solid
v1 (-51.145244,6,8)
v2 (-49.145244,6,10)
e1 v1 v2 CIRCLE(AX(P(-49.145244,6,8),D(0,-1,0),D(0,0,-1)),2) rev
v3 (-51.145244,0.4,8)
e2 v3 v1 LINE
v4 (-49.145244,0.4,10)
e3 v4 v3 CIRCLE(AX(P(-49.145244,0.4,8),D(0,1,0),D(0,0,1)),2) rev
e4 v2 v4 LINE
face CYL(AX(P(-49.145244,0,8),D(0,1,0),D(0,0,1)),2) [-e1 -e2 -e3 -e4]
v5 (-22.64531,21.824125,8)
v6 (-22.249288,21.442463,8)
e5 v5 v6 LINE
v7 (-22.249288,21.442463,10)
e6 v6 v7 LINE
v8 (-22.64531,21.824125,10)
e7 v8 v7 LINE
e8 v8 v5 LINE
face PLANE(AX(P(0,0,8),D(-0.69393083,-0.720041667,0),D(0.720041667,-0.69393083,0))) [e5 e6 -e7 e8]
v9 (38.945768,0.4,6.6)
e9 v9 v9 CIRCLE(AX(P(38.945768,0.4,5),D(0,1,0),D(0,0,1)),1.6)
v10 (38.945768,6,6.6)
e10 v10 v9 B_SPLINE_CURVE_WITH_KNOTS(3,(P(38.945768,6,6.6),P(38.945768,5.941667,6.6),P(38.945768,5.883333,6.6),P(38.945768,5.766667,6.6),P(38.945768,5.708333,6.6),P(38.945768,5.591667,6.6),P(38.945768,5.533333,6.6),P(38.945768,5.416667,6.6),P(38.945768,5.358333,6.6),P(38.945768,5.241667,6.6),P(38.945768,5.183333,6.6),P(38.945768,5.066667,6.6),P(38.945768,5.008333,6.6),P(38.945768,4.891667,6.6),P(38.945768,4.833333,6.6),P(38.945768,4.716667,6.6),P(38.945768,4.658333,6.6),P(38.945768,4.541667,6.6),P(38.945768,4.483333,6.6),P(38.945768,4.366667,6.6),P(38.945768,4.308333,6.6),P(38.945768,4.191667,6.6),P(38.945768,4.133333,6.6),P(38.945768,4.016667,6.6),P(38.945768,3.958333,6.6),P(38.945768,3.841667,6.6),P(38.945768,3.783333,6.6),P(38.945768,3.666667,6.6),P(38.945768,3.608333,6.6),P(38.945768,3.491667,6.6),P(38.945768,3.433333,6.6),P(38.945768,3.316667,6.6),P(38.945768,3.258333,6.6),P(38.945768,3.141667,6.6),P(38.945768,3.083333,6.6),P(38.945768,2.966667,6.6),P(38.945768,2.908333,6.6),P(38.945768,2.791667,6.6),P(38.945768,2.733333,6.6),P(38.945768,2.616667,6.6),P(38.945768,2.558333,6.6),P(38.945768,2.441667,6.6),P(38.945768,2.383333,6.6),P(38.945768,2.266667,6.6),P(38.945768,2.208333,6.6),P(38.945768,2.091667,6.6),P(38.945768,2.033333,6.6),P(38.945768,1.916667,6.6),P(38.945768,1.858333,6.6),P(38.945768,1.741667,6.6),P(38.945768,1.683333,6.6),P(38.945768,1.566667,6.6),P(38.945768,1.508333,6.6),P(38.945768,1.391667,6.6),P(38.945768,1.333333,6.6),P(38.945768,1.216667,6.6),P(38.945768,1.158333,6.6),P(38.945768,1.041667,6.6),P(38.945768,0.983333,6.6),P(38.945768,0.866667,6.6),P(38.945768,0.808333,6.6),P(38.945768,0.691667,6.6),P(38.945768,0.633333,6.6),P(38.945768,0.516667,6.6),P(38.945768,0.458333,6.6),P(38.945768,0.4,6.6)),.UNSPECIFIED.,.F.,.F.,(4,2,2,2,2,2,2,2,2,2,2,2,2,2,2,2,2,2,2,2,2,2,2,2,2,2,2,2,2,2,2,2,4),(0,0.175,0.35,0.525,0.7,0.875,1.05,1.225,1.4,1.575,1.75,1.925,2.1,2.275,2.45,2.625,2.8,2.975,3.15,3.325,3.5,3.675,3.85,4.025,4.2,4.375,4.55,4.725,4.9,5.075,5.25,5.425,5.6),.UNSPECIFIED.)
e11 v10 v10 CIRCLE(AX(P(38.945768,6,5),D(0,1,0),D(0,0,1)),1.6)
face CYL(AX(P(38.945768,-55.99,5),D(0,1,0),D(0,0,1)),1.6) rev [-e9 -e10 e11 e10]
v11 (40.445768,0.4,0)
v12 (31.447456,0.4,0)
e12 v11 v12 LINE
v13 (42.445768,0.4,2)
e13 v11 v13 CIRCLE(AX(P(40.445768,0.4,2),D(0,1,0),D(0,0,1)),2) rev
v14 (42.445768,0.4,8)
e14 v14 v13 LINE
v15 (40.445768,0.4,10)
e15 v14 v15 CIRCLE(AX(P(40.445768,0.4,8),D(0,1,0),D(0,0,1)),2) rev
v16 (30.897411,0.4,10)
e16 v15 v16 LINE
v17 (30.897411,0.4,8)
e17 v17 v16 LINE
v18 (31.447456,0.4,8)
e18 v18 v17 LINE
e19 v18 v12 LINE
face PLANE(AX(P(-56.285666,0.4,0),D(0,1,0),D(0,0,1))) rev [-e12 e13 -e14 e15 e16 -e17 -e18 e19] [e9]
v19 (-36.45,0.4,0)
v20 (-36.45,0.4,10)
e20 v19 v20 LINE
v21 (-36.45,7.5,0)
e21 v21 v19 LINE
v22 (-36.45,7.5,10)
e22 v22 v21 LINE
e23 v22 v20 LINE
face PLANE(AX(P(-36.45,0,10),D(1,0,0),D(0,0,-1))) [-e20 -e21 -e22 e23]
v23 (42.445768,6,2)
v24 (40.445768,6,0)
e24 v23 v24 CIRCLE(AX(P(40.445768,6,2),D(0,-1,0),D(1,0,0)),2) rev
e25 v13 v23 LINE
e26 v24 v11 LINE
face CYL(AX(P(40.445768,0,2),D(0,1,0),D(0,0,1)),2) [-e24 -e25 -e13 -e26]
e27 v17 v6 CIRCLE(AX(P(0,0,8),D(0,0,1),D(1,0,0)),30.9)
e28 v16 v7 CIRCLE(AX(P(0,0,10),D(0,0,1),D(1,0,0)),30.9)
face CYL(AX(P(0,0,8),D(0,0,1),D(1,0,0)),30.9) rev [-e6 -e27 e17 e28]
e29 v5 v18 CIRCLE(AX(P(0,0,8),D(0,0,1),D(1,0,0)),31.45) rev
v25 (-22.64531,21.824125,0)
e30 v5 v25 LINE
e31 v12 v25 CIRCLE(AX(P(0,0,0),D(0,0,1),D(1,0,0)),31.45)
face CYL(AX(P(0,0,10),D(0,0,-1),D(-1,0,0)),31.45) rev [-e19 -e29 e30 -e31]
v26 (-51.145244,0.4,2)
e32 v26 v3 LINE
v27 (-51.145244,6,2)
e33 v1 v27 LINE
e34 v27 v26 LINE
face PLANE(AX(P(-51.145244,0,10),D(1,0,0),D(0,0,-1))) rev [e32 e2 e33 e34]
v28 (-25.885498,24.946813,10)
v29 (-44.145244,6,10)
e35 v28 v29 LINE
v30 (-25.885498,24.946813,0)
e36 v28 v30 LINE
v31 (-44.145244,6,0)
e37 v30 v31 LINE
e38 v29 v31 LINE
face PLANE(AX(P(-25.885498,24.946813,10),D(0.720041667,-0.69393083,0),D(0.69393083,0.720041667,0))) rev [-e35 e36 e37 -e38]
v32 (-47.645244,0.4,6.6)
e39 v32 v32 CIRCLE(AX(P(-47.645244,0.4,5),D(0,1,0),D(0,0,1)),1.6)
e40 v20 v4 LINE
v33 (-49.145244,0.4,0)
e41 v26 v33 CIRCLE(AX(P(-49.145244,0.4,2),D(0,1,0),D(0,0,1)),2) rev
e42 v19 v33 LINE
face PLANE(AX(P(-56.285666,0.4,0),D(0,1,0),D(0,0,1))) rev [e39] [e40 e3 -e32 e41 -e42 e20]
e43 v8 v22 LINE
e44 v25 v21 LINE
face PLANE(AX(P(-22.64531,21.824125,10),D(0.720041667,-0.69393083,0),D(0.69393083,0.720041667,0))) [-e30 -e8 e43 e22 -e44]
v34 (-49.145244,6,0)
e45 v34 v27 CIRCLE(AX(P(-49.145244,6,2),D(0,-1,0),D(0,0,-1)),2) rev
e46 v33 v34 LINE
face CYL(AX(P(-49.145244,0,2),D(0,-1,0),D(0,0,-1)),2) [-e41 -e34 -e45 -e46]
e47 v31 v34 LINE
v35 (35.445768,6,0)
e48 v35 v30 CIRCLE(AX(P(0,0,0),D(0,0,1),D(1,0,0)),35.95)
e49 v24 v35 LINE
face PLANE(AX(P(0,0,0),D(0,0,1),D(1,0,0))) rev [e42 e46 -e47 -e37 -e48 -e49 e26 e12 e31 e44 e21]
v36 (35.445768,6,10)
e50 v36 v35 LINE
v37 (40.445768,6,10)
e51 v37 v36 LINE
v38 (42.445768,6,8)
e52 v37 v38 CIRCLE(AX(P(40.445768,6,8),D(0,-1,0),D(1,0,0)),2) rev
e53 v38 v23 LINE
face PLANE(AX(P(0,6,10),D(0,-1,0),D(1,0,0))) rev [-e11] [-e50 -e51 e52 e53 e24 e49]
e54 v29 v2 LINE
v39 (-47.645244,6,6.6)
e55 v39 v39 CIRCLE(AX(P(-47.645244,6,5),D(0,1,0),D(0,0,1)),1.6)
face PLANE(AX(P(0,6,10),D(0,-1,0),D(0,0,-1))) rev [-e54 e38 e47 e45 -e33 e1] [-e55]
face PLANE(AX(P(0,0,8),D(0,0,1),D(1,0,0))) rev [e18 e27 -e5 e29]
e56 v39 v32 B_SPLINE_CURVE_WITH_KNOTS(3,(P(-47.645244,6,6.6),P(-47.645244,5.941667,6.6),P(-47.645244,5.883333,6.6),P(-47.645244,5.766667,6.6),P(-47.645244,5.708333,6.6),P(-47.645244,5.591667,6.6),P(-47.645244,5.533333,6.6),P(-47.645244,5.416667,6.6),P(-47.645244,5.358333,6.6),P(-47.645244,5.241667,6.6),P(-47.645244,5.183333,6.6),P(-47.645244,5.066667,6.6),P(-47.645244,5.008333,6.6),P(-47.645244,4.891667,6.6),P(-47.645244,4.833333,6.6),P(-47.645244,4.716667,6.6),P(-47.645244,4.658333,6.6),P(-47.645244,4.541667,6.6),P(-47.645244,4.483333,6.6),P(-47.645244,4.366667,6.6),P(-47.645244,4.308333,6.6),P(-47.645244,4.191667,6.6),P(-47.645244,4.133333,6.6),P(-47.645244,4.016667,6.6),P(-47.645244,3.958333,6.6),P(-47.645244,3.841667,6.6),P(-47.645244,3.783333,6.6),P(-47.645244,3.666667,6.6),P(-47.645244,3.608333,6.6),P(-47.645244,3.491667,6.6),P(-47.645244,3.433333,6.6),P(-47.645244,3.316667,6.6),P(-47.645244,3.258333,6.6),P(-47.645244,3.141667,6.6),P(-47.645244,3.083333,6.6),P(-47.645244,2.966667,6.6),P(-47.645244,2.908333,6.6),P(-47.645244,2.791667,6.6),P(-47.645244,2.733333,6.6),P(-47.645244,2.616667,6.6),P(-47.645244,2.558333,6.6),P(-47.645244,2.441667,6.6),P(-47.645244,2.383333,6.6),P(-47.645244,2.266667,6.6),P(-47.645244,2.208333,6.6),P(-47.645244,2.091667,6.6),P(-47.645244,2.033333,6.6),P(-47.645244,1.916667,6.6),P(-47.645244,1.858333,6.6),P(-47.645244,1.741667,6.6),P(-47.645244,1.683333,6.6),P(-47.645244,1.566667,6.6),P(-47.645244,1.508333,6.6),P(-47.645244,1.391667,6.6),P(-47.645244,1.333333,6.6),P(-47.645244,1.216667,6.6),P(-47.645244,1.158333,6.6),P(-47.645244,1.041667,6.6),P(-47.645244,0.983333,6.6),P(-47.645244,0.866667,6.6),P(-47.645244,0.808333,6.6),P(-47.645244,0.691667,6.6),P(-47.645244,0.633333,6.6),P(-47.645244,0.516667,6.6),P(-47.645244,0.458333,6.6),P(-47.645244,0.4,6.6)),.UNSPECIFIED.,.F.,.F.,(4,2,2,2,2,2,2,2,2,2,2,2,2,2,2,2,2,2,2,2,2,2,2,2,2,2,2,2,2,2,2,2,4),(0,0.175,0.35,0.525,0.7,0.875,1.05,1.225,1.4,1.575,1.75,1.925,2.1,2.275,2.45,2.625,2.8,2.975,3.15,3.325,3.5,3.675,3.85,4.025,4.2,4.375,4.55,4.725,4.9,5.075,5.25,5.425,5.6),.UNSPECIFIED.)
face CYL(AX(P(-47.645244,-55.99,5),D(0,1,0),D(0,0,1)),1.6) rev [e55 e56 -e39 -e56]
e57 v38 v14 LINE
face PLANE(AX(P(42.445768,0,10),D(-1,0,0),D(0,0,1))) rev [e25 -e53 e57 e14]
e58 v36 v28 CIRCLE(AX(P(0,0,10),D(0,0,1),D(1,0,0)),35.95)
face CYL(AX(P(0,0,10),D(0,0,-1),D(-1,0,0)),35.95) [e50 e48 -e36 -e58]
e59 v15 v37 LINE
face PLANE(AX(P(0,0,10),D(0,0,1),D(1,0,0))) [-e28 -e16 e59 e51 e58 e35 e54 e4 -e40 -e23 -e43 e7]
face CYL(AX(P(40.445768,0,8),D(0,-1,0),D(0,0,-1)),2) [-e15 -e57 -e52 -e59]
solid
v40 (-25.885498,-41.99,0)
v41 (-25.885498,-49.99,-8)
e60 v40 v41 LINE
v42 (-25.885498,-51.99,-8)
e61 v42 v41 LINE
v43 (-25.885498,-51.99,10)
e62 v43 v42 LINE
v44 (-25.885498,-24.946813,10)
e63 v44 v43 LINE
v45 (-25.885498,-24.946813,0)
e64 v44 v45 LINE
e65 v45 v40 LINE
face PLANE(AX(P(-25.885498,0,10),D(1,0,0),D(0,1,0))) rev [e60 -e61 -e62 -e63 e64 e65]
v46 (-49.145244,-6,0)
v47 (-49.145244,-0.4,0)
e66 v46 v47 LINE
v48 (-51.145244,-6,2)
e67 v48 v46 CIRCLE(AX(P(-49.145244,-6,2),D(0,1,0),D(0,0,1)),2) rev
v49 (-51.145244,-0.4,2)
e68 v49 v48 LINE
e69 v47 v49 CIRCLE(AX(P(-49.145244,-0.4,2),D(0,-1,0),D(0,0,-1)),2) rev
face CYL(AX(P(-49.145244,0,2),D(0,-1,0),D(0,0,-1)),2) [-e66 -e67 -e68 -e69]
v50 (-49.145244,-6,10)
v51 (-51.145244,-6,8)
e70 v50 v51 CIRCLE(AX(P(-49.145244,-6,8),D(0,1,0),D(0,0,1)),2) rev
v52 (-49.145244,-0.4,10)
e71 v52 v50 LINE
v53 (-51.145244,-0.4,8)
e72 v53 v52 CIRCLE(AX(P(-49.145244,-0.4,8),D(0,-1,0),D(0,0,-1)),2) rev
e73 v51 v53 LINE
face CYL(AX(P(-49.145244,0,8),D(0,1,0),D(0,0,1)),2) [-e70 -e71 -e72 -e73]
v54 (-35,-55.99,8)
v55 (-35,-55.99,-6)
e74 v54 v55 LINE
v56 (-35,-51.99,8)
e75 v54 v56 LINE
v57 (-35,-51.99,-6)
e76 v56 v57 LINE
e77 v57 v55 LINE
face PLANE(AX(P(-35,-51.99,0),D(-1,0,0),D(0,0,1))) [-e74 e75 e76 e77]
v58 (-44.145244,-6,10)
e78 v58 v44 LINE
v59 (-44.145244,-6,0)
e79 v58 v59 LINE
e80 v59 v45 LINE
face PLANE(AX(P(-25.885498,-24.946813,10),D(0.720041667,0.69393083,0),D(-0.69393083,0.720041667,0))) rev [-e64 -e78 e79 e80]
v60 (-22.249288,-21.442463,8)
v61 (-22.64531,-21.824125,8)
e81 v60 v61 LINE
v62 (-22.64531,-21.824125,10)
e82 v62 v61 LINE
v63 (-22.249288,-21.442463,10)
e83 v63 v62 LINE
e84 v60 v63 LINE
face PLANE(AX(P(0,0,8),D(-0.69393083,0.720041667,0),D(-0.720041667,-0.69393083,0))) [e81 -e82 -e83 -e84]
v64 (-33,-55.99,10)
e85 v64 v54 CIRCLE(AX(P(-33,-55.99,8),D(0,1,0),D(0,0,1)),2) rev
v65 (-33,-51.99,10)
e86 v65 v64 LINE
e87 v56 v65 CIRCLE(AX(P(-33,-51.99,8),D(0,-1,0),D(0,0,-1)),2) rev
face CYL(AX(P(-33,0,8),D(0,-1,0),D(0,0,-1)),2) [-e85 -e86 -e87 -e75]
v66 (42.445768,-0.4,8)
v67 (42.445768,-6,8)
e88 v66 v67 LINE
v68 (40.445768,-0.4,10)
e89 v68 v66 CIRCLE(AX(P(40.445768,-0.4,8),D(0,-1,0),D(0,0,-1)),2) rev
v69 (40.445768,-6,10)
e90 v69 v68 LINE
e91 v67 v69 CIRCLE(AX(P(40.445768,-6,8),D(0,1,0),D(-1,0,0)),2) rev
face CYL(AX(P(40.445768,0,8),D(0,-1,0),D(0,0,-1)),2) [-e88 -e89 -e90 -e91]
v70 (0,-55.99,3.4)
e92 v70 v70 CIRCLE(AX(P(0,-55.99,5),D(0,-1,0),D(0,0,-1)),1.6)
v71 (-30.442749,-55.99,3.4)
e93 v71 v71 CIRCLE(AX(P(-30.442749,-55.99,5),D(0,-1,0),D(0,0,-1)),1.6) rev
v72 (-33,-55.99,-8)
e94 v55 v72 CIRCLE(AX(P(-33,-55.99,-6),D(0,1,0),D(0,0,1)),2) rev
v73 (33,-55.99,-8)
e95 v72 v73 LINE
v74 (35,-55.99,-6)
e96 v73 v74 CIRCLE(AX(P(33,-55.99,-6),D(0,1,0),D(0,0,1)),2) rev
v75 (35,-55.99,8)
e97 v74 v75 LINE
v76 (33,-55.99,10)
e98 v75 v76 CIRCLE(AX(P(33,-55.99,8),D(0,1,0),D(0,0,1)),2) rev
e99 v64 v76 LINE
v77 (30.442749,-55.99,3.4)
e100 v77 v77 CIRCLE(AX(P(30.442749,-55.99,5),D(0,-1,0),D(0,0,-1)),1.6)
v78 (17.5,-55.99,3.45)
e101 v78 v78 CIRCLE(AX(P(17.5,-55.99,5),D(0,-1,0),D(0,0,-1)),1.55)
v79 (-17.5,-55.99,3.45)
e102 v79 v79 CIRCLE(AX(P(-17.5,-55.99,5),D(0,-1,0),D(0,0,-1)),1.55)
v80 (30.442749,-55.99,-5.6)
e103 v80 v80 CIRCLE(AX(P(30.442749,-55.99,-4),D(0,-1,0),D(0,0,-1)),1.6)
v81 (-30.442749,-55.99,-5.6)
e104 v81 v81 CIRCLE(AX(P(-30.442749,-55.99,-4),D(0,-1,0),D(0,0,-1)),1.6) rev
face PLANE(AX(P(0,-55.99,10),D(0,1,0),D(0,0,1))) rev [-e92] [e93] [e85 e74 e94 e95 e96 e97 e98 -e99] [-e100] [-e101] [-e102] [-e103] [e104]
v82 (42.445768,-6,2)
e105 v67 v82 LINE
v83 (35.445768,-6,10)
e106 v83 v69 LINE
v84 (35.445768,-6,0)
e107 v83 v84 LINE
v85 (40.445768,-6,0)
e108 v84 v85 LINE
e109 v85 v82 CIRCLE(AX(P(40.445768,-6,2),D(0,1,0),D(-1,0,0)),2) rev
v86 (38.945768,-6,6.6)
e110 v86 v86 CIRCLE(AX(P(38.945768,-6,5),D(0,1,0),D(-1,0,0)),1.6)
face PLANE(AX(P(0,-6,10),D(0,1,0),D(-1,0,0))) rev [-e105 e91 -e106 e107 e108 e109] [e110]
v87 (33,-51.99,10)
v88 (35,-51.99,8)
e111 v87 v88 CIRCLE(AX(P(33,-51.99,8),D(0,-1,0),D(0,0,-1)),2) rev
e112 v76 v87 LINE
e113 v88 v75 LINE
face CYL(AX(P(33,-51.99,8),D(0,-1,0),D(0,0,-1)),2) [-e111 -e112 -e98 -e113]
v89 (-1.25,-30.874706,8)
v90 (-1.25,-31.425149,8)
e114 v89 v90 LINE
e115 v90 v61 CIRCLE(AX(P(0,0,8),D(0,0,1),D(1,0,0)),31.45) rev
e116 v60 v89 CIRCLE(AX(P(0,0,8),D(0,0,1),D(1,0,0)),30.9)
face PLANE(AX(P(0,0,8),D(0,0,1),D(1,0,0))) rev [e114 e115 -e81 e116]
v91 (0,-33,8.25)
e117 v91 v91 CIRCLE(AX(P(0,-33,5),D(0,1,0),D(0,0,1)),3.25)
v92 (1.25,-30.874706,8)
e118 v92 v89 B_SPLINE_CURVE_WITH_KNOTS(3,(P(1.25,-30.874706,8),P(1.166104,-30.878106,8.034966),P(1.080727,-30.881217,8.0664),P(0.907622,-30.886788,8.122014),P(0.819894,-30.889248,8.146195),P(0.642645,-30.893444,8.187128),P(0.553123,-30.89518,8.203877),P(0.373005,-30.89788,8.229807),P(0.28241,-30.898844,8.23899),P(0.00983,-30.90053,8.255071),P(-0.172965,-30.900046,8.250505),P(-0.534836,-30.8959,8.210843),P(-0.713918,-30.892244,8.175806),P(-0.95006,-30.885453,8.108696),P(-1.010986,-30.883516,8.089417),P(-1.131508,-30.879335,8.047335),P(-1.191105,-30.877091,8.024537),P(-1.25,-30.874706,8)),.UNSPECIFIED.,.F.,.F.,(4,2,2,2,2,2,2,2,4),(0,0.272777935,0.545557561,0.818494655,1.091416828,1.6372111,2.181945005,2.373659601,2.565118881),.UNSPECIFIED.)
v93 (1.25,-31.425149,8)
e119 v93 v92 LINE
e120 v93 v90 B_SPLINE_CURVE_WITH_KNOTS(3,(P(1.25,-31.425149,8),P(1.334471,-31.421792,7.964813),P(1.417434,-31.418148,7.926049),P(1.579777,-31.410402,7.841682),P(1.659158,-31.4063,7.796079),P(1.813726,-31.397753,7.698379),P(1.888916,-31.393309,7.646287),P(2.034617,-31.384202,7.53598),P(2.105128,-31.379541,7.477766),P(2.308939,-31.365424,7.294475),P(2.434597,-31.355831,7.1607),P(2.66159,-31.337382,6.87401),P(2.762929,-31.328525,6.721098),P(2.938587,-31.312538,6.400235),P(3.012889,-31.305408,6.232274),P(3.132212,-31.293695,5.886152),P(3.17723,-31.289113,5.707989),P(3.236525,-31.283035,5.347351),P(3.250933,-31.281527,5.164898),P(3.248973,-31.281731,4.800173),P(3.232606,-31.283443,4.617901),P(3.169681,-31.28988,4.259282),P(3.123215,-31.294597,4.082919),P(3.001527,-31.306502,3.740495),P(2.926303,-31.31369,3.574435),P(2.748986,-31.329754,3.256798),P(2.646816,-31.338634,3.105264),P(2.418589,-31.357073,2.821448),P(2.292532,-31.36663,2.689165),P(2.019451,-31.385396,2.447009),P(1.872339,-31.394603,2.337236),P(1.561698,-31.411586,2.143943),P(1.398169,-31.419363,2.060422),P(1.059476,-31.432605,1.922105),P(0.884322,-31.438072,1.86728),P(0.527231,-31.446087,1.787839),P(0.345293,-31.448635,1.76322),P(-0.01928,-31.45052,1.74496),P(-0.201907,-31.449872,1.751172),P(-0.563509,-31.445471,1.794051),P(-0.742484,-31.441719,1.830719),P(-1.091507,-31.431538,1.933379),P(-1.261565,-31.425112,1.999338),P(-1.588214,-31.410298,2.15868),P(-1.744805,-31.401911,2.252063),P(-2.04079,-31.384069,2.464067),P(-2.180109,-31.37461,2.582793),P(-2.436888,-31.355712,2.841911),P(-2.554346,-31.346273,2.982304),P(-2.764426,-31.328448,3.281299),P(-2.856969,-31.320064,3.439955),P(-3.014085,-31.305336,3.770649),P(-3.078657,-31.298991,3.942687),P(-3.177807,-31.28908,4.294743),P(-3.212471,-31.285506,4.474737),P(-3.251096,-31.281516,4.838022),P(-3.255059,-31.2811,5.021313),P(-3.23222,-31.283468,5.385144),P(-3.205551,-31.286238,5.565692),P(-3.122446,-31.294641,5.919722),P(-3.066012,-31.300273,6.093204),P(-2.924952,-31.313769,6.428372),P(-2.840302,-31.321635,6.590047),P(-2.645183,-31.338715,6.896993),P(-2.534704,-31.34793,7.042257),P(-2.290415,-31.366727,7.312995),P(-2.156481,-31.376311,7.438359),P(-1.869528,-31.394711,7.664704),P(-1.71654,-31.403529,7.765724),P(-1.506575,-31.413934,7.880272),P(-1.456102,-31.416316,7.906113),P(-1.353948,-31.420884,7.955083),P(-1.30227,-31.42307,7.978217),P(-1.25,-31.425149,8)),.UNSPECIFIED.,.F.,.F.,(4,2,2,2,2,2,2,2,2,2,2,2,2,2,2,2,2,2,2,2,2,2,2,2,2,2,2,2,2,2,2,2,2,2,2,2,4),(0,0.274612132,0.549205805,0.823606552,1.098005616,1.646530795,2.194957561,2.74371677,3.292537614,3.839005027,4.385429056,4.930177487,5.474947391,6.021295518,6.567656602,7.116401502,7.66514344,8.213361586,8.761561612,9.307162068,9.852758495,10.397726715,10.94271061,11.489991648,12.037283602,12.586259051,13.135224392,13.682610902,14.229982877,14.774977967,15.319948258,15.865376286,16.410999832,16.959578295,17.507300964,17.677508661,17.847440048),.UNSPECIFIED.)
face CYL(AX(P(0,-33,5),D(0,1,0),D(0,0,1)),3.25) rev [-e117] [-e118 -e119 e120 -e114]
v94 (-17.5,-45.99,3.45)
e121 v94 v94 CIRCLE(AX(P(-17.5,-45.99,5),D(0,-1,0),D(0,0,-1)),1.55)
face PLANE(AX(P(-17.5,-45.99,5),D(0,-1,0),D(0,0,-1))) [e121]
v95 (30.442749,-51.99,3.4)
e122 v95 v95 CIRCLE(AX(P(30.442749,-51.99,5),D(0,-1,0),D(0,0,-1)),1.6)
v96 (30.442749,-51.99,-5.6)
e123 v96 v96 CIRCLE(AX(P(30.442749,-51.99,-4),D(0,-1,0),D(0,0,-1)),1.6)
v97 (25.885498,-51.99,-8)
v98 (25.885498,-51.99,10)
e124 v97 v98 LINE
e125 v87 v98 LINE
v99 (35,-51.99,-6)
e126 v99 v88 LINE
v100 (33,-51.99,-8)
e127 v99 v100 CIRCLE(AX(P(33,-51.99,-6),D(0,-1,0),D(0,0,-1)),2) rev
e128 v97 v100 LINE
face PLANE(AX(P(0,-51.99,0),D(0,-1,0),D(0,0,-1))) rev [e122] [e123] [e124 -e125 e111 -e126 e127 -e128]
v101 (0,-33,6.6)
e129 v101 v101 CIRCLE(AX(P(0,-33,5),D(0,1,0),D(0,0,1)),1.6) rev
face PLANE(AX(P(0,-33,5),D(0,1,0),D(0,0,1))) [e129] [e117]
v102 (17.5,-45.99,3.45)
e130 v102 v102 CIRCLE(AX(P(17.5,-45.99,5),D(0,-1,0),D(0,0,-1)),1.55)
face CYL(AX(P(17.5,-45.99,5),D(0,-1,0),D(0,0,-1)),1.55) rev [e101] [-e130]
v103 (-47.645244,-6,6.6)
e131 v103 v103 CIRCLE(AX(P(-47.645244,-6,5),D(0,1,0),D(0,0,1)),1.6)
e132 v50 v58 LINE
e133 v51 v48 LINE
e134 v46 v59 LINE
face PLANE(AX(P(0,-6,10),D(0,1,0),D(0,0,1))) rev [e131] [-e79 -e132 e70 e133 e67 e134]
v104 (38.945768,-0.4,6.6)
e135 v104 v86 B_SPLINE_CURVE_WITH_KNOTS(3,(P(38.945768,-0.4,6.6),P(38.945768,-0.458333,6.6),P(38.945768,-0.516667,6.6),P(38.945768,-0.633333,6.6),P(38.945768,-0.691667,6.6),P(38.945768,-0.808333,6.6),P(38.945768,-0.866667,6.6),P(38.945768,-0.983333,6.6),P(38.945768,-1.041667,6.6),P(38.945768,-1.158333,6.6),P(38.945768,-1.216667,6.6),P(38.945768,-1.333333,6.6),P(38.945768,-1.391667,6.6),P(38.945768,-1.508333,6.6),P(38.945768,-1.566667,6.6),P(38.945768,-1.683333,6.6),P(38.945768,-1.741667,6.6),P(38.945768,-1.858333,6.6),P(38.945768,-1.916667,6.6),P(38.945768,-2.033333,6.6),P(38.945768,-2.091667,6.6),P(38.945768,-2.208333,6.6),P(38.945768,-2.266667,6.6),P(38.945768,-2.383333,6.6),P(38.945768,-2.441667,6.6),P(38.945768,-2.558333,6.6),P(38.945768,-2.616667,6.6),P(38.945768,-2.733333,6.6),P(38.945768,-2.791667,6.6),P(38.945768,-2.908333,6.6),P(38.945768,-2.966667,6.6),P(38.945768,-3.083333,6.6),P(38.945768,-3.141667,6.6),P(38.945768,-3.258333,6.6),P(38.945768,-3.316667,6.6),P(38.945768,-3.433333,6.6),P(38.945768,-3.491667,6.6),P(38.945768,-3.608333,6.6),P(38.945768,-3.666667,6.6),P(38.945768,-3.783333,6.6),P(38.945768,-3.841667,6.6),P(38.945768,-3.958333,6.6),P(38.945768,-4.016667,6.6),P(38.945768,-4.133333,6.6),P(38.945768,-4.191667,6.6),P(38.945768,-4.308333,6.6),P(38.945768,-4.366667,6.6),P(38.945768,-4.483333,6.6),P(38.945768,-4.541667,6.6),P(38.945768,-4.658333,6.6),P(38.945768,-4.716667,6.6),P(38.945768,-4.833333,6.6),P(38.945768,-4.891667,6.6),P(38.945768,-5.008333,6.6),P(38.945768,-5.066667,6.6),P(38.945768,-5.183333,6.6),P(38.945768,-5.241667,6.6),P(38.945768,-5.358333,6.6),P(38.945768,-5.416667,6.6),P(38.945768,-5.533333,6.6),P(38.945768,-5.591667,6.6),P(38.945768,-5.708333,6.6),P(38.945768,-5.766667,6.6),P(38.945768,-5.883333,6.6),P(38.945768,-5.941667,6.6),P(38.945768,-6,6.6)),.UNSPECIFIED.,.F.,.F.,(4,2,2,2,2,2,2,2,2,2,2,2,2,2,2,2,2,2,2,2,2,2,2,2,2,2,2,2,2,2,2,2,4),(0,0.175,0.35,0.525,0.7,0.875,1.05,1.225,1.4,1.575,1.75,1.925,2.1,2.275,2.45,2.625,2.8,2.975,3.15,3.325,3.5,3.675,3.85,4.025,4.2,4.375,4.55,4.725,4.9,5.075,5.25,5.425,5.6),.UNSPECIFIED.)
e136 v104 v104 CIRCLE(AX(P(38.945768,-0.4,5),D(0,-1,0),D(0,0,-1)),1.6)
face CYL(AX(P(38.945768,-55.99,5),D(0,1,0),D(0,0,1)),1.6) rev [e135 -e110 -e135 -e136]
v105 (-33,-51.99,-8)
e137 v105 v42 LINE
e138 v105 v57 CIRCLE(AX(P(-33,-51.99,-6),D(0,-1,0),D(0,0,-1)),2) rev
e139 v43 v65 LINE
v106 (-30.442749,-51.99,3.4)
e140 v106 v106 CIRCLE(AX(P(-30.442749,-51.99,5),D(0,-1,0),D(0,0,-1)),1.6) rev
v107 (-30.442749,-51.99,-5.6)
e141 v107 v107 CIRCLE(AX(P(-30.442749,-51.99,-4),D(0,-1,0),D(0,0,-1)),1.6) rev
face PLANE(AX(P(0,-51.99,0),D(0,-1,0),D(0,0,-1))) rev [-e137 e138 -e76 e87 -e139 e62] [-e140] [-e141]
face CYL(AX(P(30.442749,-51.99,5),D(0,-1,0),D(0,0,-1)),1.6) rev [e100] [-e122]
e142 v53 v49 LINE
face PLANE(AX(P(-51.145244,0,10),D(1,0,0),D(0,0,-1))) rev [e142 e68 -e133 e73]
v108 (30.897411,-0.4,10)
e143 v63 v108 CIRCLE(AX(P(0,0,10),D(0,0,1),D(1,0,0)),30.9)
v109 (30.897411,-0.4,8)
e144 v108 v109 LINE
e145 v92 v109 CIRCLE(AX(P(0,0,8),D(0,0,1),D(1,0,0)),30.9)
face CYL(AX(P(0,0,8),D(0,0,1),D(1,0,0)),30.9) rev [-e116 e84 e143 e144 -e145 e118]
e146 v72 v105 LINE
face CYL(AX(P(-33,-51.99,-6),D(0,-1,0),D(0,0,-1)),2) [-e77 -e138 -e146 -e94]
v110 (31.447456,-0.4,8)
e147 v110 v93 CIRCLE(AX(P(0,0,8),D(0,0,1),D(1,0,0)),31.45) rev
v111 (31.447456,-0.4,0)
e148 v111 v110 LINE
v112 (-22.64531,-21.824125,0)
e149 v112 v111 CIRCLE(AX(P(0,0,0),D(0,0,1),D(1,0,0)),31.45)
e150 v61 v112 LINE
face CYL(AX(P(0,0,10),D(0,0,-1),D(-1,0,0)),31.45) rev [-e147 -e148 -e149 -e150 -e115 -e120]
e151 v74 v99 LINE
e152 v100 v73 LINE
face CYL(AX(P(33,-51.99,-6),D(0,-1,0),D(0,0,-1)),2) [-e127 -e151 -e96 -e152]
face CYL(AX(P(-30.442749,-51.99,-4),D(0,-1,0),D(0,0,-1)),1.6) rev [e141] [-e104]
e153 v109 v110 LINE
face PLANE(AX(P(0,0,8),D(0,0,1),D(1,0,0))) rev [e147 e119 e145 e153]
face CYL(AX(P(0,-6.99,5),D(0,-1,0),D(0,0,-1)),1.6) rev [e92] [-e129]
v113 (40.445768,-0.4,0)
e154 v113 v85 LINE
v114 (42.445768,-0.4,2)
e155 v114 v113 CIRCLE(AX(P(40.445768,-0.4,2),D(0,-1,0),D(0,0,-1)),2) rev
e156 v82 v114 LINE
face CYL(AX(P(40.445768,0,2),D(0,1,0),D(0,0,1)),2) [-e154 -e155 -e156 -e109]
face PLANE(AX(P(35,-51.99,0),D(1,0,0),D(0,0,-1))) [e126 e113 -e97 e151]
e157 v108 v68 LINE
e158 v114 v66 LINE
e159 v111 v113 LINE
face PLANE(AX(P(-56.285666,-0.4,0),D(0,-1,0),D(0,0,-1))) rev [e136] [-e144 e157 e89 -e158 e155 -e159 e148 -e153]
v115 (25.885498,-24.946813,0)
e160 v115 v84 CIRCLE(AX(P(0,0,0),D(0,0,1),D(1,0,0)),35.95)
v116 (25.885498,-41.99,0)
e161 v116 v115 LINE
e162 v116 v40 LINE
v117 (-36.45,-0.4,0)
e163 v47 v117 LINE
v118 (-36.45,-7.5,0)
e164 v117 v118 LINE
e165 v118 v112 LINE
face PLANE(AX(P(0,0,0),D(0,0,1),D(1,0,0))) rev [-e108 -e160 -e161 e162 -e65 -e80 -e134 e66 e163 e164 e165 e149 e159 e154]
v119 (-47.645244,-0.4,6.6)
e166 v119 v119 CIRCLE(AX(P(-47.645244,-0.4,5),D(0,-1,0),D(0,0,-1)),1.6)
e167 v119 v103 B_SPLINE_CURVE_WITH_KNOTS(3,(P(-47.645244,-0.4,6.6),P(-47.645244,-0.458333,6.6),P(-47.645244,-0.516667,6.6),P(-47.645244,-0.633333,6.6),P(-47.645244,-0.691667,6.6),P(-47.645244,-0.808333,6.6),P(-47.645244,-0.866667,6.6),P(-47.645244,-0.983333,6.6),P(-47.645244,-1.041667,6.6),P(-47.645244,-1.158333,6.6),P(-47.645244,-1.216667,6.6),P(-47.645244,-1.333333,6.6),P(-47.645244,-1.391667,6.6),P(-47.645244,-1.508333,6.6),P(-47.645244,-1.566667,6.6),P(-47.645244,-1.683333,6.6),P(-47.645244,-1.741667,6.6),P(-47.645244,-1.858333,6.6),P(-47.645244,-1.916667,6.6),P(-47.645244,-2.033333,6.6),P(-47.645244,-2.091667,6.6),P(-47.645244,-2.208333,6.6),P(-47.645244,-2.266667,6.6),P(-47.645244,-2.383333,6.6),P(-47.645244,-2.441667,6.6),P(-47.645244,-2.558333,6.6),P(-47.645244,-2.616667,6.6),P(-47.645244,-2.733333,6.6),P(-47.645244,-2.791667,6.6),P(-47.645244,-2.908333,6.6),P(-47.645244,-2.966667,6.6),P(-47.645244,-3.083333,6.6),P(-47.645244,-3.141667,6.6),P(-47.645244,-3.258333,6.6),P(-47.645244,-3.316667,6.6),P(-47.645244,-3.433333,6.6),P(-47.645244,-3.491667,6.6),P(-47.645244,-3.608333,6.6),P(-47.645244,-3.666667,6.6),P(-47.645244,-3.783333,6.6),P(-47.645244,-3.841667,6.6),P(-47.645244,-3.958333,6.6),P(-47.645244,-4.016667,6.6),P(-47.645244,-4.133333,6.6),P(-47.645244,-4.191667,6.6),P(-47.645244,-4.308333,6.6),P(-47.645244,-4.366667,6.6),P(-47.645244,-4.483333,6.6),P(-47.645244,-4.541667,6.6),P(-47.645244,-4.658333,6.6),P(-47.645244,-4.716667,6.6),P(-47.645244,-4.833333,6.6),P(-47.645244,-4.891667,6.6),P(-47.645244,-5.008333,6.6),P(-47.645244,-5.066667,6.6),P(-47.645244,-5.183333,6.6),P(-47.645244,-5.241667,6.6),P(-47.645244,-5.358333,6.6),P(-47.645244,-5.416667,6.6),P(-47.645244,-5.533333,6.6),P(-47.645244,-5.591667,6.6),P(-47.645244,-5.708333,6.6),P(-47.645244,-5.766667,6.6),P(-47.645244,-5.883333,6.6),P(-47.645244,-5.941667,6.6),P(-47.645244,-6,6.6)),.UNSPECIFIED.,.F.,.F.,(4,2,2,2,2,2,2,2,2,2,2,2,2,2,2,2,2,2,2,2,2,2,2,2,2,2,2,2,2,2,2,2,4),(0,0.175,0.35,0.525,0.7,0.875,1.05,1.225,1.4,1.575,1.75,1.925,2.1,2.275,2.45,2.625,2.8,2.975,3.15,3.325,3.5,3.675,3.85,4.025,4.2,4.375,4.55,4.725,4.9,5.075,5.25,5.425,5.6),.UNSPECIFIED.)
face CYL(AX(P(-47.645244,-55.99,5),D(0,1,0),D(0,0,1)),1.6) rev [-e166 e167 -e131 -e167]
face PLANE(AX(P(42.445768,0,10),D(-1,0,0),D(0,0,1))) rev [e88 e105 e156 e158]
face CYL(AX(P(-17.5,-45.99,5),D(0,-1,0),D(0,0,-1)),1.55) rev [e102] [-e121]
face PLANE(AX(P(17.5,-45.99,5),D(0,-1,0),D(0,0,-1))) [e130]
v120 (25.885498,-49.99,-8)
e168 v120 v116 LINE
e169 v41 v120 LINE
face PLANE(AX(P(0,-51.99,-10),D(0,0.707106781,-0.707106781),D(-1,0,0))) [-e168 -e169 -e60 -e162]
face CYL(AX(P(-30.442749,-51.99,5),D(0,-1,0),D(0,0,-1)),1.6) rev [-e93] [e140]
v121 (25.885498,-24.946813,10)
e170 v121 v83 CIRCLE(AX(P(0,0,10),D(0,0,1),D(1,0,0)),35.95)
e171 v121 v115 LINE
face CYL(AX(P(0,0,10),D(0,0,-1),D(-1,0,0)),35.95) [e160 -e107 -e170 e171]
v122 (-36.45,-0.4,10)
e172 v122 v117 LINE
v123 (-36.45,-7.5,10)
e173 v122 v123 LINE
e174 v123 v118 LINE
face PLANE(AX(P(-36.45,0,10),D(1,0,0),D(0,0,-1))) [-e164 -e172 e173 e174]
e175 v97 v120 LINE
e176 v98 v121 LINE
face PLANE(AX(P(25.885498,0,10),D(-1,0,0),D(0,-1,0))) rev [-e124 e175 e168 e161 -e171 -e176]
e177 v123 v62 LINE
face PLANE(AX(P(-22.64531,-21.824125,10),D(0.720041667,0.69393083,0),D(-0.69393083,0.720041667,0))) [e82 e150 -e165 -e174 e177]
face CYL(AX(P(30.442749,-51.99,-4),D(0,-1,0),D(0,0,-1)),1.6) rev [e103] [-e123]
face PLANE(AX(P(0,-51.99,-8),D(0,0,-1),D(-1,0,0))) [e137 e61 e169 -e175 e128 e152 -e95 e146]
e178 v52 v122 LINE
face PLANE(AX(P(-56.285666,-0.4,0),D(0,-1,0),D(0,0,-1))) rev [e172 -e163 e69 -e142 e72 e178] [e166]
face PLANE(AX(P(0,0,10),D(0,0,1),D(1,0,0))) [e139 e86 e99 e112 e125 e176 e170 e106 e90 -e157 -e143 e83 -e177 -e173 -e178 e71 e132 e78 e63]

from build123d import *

# Parameters (mm, degrees)
BOSS_EXTRUDE1_DEPTH = 10
BOSS_EXTRUDE2_START = -2
BOSS_EXTRUDE2_DEPTH = 2
SKETCH3_W           = 112.571331904
SKETCH3_H           = 0.8
CUT_EXTRUDE1_DEPTH  = 77.489973678
SKETCH4_R           = 1.55
CUT_EXTRUDE2_DEPTH  = 10
SKETCH5_R           = 1.6
CUT_EXTRUDE3_DEPTH  = 81.985159587
FILLET1_R           = 2
FILLET2_R           = 2
SKETCH6_R           = 1.6
BOSS_EXTRUDE3_DEPTH = 4
FILLET3_R           = 2
CHAMFER1_SIZE       = 10
SKETCH7_R           = 1.6
CUT_EXTRUDE4_DEPTH  = 49
SKETCH8_R           = 3.25
CUT_EXTRUDE5_DEPTH  = 33


with BuildPart() as part:
    # Sketch1 → Boss-Extrude1 (new body)
    with BuildSketch(Plane.XY):
        with BuildLine():
            Line((42.445768436, 6), (35.445768436, 6))
            ThreePointArc((35.445768436, 6), (10.611085103, 34.348324165), (-25.885497938, 24.946813353))
            Line((-25.885497938, 24.946813353), (-44.145243897, 6))
            Line((-44.145243897, 6), (-51.145243897, 6))
            Line((-51.145243897, 6), (-51.145243897, -6))
            Line((-51.145243897, -6), (-44.145243897, -6))
            Line((-44.145243897, -6), (-25.885497938, -24.946813353))
            Line((-25.885497938, -24.946813353), (-25.885497938, -55.99))
            Line((-25.885497938, -55.99), (25.885497938, -55.99))
            Line((25.885497938, -55.99), (25.885497938, -24.946813353))
            ThreePointArc((25.885497938, -24.946813353), (32.095583697, -16.194937702), (35.445768436, -6))
            Line((35.445768436, -6), (42.445768436, -6))
            Line((42.445768436, -6), (42.445768436, 6))
        make_face()
        with BuildLine():
            ThreePointArc((-22.645310436, 21.824124617), (31.45, 0), (-22.645310436, -21.824124617))
            Line((-22.645310436, -21.824124617), (-36.45, -7.5))
            Line((-36.45, -7.5), (-36.45, 7.5))
            Line((-36.45, 7.5), (-22.645310436, 21.824124617))
        make_face(mode=Mode.SUBTRACT)
    extrude(amount=BOSS_EXTRUDE1_DEPTH)

    # Sketch2 → Boss-Extrude2 (add)
    with BuildSketch(Plane.XY.offset(10).offset(BOSS_EXTRUDE2_START)):
        with BuildLine():
            ThreePointArc((-22.645310436, -21.824124617), (31.45, 0), (-22.645310436, 21.824124617))
            Line((-22.645310436, 21.824124617), (-22.249287519, 21.44246266))
            ThreePointArc((-22.249287519, 21.44246266), (11.560861034, 28.655828241), (30.9, 0))
            ThreePointArc((30.9, 0), (11.560861034, -28.655828241), (-22.249287519, -21.44246266))
            Line((-22.249287519, -21.44246266), (-22.645310436, -21.824124617))
        make_face()
    extrude(amount=BOSS_EXTRUDE2_DEPTH)

    # Sketch3 → Cut-Extrude1 (cut, through all)
    with BuildSketch(Plane.XY.offset(10)):
        Rectangle(SKETCH3_W, SKETCH3_H)
    extrude(amount=-CUT_EXTRUDE1_DEPTH, mode=Mode.SUBTRACT)


with BuildPart() as cut_extrude1_piece_1:
    # of the separate pieces the step leaves, piece 1, a body of its own (cut_extrude1_pieces)
    add(part.part.solids().sort_by_distance((35.445768436, -6, 0))[0])

    # Sketch4 → Cut-Extrude2 (cut)
    with BuildSketch(Plane.XZ.offset(55.99)):
        with Locations(Location((-17.5, 5, 0), (0, 0, 270))):
            Circle(SKETCH4_R)
        with Locations(Location((17.5, 5, 0), (0, 0, 270))):
            Circle(SKETCH4_R)
    extrude(amount=-CUT_EXTRUDE2_DEPTH, mode=Mode.SUBTRACT)


with BuildPart() as cut_extrude1_piece_2:
    # of the separate pieces the step leaves, piece 2, a body of its own (cut_extrude1_pieces)
    add(part.part.solids().sort_by_distance((42.445768436, 0.4, 0))[0])


with BuildPart() as cut_extrude3_tool:
    # Sketch5 → Cut-Extrude3 (new, through all)
    with BuildSketch(Plane(origin=(0, 6, 0), x_dir=(1, 0, 0), z_dir=(0, 1, 0))):
        with Locations(Location((-47.645243897, -5, 0), (0, 0, 270))):
            Circle(SKETCH5_R)
        with Locations(Location((38.945768436, -5, 0), (0, 0, 270))):
            Circle(SKETCH5_R)
    extrude(amount=-CUT_EXTRUDE3_DEPTH)


with BuildPart() as cut_extrude1_piece_1_1:
    add(cut_extrude1_piece_1.part)

    # Cut-Extrude3: cut by cut_extrude3_tool
    add(cut_extrude3_tool.part, mode=Mode.SUBTRACT)

    # Fillet2
    fillet2_edges = [cut_extrude1_piece_1_1.edges().sort_by_distance(p)[0] for p in [
        (-51.145243897, -3.2, 0),
        (42.445768436, -3.2, 0),
        (-51.145243897, -3.2, 10),
        (42.445768436, -3.2, 10),
    ]]
    fillet(fillet2_edges, radius=FILLET2_R)

    # Sketch6 → Boss-Extrude3 (add)
    with BuildSketch(Plane.XZ.offset(55.99)):
        Polygon((35, -8), (35, 10), (25.885497938, 10), (25.885497938, 0), (-25.885497938, 0), (-25.885497938, 10), (-35, 10), (-35, -8), align=None)
        with Locations(Location((-30.442748969, 5, 0), (0, 0, 270))):
            Circle(SKETCH6_R, mode=Mode.SUBTRACT)
        with Locations(Location((30.442748969, -4, 0), (0, 0, 270))):
            Circle(SKETCH6_R, mode=Mode.SUBTRACT)
        with Locations(Location((30.442748969, 5, 0), (0, 0, 270))):
            Circle(SKETCH6_R, mode=Mode.SUBTRACT)
        with Locations(Location((-30.442748969, -4, 0), (0, 0, 270))):
            Circle(SKETCH6_R, mode=Mode.SUBTRACT)
    extrude(amount=-BOSS_EXTRUDE3_DEPTH)

    # Fillet3
    fillet3_edges = [cut_extrude1_piece_1_1.edges().sort_by_distance(p)[0] for p in [
        (35, -53.99, 10),
        (35, -53.99, -8),
        (-35, -53.99, -8),
        (-35, -53.99, 10),
    ]]
    fillet(fillet3_edges, radius=FILLET3_R)

    # Chamfer1
    # the kernel refuses this chamfer: 10 mm, written as the material it adds along each edge
    with BuildSketch(Plane(origin=(25.885497938, -51.99, 0), x_dir=(0, -0.027495876610586317, -0.9996219169112968), z_dir=(-1, 0, 0))) as chamfer1_piece_1_section:
        Polygon((CHAMFER1_SIZE * 0.999621916911, -CHAMFER1_SIZE * 0.0274958766106), (-CHAMFER1_SIZE * 0.0274958766106, -CHAMFER1_SIZE * 0.999621916911), (0, 0), align=None)
    chamfer1_piece_1 = extrude(amount=51.770995877, mode=Mode.PRIVATE)
    chamfer1_piece_1 = split(chamfer1_piece_1, bisect_by=Plane(origin=(0, -48.545555556, -8), z_dir=(0, 0, 1)), keep=Keep.TOP, mode=Mode.PRIVATE)
    add(chamfer1_piece_1)

    # Sketch7 → Cut-Extrude4 (cut)
    with BuildSketch(Plane.XZ.offset(55.99)):
        with Locations(Location((0, 5, 0), (0, 0, 270))):
            Circle(SKETCH7_R)
    extrude(amount=-CUT_EXTRUDE4_DEPTH, mode=Mode.SUBTRACT)

    # Sketch8 → Cut-Extrude5 (cut)
    with BuildSketch(Plane(origin=(0, 0, 0), x_dir=(1, 0, 0), z_dir=(0, 1, 0))):
        with Locations(Location((0, -5, 0), (0, 0, 270))):
            Circle(SKETCH8_R)
    extrude(amount=-CUT_EXTRUDE5_DEPTH, mode=Mode.SUBTRACT)


with BuildPart() as cut_extrude1_piece_2_1:
    add(cut_extrude1_piece_2.part)

    # Cut-Extrude3: cut by cut_extrude3_tool
    add(cut_extrude3_tool.part, mode=Mode.SUBTRACT)

    # Fillet1
    fillet1_edges = [cut_extrude1_piece_2_1.edges().sort_by_distance(p)[0] for p in [
        (-51.145243897, 3.2, 0),
        (-51.145243897, 3.2, 10),
        (42.445768436, 3.2, 0),
        (42.445768436, 3.2, 10),
    ]]
    fillet(fillet1_edges, radius=FILLET1_R)


solid = Compound([cut_extrude1_piece_1_1.part, cut_extrude1_piece_2_1.part])
